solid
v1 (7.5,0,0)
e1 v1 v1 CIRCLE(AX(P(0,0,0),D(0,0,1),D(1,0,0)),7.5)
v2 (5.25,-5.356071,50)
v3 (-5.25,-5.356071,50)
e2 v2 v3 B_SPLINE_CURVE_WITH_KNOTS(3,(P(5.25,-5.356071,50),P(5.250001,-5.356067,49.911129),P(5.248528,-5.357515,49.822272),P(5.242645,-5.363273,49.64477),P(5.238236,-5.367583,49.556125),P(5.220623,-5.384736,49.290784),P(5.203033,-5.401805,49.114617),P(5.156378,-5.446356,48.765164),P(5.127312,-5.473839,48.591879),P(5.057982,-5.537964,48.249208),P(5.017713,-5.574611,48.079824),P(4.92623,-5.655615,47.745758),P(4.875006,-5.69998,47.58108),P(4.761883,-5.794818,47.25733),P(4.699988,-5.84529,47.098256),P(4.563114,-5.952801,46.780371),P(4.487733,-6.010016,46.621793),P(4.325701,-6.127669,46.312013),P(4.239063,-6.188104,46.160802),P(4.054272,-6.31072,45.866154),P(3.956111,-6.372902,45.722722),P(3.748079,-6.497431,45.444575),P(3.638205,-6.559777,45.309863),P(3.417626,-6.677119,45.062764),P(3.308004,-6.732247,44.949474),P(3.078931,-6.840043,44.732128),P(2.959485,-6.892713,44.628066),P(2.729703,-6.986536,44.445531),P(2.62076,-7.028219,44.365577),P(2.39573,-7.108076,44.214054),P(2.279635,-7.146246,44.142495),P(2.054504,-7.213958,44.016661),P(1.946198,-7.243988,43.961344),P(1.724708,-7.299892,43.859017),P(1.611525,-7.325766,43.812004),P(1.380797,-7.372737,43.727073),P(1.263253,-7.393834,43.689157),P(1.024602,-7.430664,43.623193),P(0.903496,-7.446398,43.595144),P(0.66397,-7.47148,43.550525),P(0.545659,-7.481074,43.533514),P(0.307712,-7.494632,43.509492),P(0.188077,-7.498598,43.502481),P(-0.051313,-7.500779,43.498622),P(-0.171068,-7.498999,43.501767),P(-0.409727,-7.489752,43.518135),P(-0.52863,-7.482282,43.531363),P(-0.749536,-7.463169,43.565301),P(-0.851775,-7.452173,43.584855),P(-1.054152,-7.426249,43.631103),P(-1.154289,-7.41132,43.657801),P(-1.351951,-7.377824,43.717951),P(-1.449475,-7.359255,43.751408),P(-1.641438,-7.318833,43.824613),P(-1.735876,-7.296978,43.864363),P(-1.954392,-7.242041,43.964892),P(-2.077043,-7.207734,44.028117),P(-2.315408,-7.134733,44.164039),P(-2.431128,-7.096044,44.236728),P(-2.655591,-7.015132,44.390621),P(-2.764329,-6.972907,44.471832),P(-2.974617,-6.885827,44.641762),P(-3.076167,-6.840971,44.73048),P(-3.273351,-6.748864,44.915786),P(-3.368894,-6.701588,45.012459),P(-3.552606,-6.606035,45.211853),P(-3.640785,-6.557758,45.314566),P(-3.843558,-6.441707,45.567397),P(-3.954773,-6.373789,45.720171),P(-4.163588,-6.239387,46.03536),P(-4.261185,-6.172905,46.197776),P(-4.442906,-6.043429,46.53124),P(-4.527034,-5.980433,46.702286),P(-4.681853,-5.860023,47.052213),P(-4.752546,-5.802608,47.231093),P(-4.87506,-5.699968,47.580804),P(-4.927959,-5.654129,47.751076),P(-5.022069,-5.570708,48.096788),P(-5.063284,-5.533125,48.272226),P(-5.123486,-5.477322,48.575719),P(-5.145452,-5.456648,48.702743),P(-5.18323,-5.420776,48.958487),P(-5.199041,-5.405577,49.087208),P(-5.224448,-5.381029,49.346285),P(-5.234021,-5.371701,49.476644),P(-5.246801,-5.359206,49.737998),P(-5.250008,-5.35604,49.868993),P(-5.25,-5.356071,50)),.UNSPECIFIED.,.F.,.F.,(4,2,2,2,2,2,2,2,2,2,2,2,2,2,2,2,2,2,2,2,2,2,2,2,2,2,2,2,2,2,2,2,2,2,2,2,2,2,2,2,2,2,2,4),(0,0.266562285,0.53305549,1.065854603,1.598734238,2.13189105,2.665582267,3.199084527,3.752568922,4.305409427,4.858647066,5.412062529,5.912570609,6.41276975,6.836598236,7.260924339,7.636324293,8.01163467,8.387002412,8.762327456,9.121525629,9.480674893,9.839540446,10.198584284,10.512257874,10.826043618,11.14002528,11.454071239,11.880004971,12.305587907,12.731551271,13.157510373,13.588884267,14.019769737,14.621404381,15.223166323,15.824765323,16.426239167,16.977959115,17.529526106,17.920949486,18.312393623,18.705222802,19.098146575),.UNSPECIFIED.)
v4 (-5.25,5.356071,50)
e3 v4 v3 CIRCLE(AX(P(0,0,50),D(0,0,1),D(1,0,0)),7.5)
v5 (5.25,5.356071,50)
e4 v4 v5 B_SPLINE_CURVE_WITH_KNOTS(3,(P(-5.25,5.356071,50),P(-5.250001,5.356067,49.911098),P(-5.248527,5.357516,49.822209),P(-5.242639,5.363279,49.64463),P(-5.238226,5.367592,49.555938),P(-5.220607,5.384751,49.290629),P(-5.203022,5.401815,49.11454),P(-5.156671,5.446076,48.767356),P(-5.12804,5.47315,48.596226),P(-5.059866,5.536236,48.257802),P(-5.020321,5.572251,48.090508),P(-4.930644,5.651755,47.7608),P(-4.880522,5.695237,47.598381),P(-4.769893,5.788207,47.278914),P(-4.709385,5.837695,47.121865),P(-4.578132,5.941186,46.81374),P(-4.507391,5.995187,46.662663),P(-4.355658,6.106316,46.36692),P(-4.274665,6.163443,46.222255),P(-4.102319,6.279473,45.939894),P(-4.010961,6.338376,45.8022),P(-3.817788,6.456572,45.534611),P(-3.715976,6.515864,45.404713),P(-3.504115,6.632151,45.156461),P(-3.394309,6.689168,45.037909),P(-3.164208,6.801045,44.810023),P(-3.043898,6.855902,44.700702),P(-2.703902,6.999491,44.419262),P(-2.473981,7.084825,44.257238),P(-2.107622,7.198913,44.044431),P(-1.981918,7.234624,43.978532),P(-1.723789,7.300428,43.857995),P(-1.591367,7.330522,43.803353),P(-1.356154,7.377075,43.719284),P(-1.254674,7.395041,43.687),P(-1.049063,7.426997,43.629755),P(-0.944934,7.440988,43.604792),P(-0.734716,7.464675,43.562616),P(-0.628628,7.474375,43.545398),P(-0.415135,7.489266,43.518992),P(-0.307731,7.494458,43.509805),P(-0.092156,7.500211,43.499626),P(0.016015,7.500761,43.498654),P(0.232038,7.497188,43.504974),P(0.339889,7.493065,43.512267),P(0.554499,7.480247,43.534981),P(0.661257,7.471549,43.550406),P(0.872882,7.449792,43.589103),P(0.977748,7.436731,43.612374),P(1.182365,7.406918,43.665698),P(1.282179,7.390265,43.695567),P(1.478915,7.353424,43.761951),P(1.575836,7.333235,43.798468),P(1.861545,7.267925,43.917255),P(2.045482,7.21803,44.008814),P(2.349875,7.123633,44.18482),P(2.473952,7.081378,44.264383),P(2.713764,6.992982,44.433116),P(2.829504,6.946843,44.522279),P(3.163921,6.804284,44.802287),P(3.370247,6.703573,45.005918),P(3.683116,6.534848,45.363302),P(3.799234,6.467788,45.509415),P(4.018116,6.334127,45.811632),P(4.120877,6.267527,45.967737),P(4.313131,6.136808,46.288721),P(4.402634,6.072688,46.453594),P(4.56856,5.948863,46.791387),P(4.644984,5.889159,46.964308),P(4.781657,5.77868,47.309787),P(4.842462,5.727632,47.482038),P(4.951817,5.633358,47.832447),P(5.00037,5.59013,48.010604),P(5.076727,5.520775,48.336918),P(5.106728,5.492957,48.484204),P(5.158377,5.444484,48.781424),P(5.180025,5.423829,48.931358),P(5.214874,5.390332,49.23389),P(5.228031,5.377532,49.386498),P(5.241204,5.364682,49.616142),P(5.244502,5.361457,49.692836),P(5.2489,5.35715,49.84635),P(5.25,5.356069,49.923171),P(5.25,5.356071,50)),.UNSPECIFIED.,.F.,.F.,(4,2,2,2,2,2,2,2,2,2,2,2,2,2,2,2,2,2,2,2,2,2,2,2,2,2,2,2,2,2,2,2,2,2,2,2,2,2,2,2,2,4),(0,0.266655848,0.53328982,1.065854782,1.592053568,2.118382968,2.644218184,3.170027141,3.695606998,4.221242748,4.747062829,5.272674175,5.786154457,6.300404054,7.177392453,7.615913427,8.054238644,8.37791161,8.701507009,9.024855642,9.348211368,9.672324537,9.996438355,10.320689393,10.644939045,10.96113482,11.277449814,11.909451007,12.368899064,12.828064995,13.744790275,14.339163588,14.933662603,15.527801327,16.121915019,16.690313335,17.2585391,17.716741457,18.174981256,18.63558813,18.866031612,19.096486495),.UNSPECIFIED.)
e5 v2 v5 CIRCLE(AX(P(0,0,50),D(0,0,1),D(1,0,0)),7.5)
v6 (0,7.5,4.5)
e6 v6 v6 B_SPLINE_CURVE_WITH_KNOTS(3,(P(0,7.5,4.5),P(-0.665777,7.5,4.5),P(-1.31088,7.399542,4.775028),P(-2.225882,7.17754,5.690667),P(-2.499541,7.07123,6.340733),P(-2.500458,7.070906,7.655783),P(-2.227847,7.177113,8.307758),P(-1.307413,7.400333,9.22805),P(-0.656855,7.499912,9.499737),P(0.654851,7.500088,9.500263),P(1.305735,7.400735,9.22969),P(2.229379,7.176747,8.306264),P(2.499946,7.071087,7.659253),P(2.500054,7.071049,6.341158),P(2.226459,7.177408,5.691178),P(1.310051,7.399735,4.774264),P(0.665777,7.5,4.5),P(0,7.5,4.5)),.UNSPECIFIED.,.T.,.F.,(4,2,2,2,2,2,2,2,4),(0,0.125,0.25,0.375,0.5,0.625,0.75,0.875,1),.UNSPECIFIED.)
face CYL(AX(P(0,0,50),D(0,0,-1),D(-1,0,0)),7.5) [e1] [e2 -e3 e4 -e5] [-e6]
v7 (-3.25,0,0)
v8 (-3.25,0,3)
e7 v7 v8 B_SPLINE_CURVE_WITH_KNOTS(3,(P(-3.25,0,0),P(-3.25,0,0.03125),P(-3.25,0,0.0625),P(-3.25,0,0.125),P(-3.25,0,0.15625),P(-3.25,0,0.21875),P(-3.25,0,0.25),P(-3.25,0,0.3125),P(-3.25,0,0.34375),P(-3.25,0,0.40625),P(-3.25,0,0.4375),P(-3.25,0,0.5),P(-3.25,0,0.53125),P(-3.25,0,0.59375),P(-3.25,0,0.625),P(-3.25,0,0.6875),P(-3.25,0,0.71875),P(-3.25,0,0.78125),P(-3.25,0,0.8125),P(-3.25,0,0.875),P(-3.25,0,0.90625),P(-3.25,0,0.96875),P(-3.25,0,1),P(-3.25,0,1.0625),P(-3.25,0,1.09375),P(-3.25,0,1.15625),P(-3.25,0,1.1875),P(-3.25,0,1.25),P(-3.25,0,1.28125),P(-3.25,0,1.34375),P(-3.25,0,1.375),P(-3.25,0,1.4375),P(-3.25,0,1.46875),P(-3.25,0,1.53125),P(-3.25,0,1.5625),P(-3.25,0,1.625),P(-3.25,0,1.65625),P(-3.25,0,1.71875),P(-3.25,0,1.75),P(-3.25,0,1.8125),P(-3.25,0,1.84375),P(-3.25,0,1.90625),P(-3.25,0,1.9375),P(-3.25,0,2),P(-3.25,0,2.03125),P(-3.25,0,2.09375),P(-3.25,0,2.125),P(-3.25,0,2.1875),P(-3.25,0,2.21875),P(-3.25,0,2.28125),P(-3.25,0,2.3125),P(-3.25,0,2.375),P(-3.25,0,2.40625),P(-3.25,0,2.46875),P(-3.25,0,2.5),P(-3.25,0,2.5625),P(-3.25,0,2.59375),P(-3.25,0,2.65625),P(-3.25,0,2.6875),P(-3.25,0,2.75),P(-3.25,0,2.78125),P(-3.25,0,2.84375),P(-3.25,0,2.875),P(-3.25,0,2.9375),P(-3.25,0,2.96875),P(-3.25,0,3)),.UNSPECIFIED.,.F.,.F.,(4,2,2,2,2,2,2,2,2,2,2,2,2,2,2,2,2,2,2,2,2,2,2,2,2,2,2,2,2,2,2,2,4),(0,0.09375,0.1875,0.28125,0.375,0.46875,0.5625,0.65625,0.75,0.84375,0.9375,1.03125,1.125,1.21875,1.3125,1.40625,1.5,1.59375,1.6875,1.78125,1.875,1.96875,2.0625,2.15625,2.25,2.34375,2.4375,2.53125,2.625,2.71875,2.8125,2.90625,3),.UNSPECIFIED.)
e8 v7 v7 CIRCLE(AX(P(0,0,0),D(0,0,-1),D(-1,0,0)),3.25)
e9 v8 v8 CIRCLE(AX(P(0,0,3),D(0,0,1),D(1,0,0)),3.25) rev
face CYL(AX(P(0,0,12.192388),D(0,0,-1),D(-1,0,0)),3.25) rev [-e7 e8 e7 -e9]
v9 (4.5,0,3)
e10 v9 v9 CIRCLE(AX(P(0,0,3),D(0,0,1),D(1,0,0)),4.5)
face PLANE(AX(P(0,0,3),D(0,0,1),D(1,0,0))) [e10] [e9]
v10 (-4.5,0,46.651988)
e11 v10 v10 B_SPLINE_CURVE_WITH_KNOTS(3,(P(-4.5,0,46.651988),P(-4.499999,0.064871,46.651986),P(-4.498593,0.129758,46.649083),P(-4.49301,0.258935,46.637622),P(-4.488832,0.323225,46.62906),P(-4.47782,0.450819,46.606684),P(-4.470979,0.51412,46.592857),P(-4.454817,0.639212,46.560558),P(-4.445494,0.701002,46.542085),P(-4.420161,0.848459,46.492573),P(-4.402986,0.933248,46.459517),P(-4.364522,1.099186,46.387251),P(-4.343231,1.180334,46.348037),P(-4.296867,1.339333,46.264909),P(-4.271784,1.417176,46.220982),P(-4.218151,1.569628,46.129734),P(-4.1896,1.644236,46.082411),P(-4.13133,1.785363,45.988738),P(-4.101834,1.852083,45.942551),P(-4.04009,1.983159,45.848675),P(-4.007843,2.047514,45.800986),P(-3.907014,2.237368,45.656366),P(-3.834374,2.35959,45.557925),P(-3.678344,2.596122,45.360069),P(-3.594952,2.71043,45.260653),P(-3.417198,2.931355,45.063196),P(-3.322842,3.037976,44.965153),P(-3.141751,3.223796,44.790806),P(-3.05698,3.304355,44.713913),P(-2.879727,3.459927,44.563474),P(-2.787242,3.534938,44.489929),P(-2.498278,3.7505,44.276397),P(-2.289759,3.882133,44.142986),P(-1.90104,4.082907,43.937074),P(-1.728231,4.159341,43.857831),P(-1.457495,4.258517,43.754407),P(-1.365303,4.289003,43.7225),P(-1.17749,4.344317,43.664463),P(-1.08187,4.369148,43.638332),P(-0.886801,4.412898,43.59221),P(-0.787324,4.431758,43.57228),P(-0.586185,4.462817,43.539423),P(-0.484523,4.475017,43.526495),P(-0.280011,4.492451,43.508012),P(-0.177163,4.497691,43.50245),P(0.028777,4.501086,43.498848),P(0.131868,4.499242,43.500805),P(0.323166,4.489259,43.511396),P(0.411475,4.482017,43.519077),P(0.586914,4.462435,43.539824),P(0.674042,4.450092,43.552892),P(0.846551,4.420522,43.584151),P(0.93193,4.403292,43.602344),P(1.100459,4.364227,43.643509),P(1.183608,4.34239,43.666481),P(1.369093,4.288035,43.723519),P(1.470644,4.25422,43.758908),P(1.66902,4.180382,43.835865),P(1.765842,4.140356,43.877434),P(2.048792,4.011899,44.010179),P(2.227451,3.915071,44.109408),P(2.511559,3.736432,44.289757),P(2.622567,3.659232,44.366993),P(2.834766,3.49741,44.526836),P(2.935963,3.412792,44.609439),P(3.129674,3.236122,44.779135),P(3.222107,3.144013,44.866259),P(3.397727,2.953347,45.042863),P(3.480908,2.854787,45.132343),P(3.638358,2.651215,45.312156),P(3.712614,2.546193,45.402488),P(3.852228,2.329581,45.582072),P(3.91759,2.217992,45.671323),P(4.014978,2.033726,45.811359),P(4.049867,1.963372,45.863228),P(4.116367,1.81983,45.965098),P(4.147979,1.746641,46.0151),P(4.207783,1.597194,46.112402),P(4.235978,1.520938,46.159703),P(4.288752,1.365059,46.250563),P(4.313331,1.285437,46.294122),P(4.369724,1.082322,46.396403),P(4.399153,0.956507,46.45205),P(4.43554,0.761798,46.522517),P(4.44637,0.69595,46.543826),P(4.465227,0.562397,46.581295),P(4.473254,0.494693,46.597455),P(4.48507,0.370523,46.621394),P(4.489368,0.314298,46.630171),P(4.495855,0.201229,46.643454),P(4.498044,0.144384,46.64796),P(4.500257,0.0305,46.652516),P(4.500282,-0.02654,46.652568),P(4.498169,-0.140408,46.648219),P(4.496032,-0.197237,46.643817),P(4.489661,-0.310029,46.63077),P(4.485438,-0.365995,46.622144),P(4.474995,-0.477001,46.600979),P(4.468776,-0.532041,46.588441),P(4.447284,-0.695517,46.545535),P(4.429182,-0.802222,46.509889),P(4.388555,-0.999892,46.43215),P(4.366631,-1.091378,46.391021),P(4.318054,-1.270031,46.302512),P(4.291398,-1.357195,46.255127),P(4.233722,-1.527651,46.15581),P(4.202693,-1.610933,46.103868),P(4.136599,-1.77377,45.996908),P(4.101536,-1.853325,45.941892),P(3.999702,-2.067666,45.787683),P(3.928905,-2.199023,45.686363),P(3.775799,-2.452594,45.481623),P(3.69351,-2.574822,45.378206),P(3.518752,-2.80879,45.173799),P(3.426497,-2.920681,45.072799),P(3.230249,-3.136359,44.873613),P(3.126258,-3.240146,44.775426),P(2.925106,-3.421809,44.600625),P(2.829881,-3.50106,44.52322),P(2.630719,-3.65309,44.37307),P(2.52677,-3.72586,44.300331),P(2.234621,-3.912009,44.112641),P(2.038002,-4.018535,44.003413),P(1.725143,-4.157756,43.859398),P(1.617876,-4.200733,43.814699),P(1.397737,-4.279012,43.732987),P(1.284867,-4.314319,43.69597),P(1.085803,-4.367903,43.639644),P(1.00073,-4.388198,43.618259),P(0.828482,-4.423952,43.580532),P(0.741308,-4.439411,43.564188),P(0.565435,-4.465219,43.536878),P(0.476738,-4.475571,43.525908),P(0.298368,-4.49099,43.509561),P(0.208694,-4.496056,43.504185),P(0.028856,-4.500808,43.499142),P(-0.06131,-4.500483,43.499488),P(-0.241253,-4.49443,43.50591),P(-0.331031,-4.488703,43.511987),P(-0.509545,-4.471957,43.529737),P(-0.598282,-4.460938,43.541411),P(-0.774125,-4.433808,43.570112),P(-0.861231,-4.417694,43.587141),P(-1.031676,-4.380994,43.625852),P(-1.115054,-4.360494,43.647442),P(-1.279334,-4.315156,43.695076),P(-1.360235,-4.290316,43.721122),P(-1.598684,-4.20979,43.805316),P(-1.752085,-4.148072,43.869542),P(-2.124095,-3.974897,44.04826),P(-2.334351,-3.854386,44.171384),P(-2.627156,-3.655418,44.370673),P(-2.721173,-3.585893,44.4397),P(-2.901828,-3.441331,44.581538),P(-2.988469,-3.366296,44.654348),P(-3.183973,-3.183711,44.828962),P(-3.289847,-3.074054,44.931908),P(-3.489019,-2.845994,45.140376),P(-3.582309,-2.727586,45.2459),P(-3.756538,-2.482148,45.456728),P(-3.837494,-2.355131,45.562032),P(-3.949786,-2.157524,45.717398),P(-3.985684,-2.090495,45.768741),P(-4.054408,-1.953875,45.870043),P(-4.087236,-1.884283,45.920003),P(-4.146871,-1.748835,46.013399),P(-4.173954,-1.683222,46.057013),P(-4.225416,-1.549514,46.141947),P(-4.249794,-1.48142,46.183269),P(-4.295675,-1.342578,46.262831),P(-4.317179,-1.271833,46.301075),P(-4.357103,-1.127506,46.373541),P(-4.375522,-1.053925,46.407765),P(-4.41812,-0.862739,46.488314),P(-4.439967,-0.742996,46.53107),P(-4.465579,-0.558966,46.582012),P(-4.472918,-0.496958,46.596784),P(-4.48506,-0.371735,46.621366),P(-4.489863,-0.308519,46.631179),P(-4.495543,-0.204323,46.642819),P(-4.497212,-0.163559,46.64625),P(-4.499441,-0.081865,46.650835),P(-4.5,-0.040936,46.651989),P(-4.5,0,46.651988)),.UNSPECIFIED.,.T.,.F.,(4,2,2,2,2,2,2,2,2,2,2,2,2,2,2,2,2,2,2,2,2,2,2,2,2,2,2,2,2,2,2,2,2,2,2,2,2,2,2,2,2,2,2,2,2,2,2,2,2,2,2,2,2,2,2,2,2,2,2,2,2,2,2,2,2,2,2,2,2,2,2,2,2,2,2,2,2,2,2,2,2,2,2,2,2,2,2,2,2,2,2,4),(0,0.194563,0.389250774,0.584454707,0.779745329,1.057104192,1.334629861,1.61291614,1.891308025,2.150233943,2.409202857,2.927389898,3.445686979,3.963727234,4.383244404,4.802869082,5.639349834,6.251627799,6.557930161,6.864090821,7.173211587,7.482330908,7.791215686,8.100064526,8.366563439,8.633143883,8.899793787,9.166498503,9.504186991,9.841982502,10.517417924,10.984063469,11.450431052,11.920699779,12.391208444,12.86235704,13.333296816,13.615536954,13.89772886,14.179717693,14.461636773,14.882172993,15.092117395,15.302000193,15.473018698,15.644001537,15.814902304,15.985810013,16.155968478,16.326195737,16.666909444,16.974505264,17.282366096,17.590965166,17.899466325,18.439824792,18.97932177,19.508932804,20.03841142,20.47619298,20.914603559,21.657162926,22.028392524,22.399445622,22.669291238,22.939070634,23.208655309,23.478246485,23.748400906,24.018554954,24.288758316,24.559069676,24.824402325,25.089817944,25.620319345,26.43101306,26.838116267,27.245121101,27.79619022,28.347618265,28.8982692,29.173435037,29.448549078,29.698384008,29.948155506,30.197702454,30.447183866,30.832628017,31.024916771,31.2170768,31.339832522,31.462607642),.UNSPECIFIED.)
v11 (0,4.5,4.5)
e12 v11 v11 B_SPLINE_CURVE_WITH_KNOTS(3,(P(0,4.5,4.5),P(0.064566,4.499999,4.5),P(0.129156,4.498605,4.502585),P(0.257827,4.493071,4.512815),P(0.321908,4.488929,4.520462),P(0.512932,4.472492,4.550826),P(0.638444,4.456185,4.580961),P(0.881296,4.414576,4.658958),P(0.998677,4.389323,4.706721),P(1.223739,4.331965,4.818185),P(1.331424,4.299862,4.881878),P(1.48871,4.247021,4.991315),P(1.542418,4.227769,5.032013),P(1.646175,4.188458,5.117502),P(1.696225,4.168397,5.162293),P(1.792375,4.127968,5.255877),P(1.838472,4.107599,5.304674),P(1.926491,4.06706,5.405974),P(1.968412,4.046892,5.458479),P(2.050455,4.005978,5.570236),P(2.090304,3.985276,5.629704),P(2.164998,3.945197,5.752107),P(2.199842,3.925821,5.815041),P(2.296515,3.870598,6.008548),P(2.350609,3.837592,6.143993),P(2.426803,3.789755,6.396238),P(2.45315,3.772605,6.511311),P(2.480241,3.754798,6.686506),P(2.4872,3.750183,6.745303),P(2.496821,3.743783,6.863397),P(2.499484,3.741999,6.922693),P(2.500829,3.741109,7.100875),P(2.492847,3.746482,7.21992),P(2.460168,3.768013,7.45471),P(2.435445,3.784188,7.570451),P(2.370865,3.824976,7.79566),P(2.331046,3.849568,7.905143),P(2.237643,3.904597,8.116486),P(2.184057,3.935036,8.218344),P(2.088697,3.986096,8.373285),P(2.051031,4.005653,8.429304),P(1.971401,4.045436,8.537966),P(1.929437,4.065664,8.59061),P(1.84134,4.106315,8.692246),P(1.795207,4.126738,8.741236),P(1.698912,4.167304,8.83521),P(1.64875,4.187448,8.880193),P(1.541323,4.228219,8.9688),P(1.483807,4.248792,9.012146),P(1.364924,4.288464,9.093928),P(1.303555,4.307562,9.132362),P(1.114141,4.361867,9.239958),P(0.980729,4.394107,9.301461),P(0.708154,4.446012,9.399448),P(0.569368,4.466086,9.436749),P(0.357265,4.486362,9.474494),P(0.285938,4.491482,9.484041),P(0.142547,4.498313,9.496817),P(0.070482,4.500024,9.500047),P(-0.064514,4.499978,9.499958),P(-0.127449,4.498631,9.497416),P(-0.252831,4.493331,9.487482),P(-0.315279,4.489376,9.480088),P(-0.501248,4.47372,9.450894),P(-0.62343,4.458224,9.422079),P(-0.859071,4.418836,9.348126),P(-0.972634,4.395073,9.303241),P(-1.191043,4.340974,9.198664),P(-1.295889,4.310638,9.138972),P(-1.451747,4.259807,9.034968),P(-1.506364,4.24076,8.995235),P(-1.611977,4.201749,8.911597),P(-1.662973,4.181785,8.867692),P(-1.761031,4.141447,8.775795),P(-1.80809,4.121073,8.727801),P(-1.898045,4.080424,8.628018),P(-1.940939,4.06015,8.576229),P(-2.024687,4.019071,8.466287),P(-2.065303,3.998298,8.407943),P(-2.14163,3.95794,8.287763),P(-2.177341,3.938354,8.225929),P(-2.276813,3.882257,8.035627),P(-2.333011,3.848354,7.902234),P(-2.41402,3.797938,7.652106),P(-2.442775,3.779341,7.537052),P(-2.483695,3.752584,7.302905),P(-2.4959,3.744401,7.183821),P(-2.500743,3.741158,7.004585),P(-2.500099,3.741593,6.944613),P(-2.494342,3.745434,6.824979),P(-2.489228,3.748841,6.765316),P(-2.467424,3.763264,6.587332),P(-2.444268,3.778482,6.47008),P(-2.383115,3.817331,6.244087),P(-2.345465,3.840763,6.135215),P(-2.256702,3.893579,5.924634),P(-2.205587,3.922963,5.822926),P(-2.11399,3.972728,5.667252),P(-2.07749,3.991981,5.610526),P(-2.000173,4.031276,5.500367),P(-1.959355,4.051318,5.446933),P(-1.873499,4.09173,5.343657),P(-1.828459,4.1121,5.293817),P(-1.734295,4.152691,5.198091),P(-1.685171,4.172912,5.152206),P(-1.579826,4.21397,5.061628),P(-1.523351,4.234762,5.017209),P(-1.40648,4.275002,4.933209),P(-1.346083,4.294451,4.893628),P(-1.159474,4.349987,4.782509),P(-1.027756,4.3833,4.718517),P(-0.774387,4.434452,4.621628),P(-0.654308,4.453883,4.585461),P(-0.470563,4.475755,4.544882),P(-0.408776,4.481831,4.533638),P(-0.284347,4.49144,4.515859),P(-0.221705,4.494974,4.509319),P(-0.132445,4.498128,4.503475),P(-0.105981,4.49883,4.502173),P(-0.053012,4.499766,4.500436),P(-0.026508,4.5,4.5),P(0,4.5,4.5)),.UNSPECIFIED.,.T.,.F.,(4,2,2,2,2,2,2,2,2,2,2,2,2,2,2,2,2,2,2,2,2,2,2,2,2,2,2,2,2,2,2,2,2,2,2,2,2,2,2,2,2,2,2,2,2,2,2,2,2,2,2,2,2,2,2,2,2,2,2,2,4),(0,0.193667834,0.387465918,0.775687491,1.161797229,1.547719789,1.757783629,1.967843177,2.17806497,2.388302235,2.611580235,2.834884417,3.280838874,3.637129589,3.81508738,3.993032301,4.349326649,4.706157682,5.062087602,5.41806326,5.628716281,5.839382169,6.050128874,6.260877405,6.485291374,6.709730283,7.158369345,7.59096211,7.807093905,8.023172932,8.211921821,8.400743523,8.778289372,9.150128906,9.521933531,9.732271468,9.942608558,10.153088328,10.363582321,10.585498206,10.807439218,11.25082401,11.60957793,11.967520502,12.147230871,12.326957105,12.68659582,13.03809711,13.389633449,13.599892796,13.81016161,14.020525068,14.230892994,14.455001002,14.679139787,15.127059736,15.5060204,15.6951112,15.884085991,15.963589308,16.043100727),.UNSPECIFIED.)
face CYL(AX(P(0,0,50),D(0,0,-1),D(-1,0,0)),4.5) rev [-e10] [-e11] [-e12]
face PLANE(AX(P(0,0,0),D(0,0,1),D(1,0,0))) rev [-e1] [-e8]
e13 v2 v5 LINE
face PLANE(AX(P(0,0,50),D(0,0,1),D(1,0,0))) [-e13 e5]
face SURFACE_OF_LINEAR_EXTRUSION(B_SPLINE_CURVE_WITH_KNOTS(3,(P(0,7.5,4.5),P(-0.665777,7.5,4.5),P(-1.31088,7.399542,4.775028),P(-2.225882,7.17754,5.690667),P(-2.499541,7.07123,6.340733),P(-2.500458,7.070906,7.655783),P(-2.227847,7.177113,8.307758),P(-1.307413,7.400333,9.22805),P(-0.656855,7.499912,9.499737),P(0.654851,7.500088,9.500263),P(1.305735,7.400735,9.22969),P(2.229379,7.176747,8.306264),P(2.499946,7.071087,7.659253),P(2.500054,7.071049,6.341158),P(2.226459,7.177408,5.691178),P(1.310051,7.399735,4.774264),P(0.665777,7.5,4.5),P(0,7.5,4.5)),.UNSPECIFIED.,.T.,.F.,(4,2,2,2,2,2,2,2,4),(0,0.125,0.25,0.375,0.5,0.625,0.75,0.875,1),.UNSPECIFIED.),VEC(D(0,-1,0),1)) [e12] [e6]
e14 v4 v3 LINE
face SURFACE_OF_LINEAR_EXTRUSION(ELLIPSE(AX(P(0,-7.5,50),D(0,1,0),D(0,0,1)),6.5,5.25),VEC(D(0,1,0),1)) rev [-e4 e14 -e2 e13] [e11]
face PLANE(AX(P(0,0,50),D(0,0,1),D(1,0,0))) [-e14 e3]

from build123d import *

# Parameters (mm, degrees)
ESQUISSE1_R                  = 7.499999999999999
BOSS_EXTRU_1_DEPTH           = 50
COQUE1_T                     = -3
ESQUISSE2_R                  = 3.25
ENL_V_MAT_EXTRU_1_DEPTH      = 3
ENL_V_START                  = 3.741658222
ENL_V_MAT_EXTRU_2_DEPTH      = 3.758341878
ENL_V_MAT_EXTRU_3_DEPTH      = 52.1126209805562
ENL_V_MAT_EXTRU_3_DEPTH_BACK = 52.1126209805562
ESQUISSE5_RX                 = 6.5
ESQUISSE5_RY                 = 5.25


# Read off the part's stored shape, not the designer's step: Enlèv. mat.-Extru.2
with BuildPart() as part:
    # Esquisse1 → Boss.-Extru.1 (new body)
    with BuildSketch(Plane.XY):
        Circle(ESQUISSE1_R)
    extrude(amount=BOSS_EXTRU_1_DEPTH)

    # Coque1
    coque1_openings = [part.faces().sort_by_distance(p)[0] for p in [
        (0, 0, 50),
    ]]
    offset(amount=COQUE1_T, openings=coque1_openings, kind=Kind.INTERSECTION)

    # Esquisse2 → Enlèv. mat.-Extru.1 (cut)
    with BuildSketch(Plane(origin=(0, 0, 0), x_dir=(-1, 0, 0), z_dir=(0, 0, -1))):
        Circle(ESQUISSE2_R)
    extrude(amount=-ENL_V_MAT_EXTRU_1_DEPTH, mode=Mode.SUBTRACT)

    # Enlèv. mat.-Extru.2 outline → Enlèv. mat.-Extru.2 (cut)
    with BuildSketch(Plane(origin=(0, 0, 0), x_dir=(1, 0, 0), z_dir=(0, 1, 0)).offset(ENL_V_START)):
        with BuildLine():
            add(Edge.make_bspline(
                [(0, -4.5), (-0.665777373921639, -4.5), (-1.3108797918298, -4.77502806566904), (-2.22588234313574, -5.69066668426073), (-2.49954115482472, -6.34073255596721), (-2.50045763095517, -7.65578287810988), (-2.2278471774147, -8.30775806725704), (-1.30741263251952, -9.22804991342628), (-0.656855076796676, -9.49973692434233), (0.654851008774013, -9.5002626740288), (1.30573460063621, -9.2296895812874), (2.22937932360176, -8.306264256457), (2.49994577794749, -7.65925317637901), (2.50005420513552, -6.34115812623399), (2.22645885760644, -5.69117807090988), (1.31005066740923, -4.77426391153354), (0.665777373921637, -4.5), (0, -4.5)],
                knots=[0, 0, 0, 0, 0.125, 0.125, 0.25, 0.25, 0.375, 0.375, 0.5, 0.5, 0.625, 0.625, 0.75, 0.75, 0.875, 0.875, 1, 1, 1, 1], degree=3))
        make_face()
    extrude(amount=ENL_V_MAT_EXTRU_2_DEPTH, mode=Mode.SUBTRACT)

    # Esquisse5 → Enlèv. mat.-Extru.3 (cut, two sides: drawn at the far end of the back side and taken through both)
    with BuildSketch(Plane(origin=(0, 0, 0), x_dir=(1, 0, 0), z_dir=(0, 1, 0)).offset(-ENL_V_MAT_EXTRU_3_DEPTH_BACK)):
        with Locations(Location((0, -50), (0, 0, -90))):
            Ellipse(ESQUISSE5_RX, ESQUISSE5_RY)
    extrude(amount=ENL_V_MAT_EXTRU_3_DEPTH + ENL_V_MAT_EXTRU_3_DEPTH_BACK, mode=Mode.SUBTRACT)


solid = part.part
